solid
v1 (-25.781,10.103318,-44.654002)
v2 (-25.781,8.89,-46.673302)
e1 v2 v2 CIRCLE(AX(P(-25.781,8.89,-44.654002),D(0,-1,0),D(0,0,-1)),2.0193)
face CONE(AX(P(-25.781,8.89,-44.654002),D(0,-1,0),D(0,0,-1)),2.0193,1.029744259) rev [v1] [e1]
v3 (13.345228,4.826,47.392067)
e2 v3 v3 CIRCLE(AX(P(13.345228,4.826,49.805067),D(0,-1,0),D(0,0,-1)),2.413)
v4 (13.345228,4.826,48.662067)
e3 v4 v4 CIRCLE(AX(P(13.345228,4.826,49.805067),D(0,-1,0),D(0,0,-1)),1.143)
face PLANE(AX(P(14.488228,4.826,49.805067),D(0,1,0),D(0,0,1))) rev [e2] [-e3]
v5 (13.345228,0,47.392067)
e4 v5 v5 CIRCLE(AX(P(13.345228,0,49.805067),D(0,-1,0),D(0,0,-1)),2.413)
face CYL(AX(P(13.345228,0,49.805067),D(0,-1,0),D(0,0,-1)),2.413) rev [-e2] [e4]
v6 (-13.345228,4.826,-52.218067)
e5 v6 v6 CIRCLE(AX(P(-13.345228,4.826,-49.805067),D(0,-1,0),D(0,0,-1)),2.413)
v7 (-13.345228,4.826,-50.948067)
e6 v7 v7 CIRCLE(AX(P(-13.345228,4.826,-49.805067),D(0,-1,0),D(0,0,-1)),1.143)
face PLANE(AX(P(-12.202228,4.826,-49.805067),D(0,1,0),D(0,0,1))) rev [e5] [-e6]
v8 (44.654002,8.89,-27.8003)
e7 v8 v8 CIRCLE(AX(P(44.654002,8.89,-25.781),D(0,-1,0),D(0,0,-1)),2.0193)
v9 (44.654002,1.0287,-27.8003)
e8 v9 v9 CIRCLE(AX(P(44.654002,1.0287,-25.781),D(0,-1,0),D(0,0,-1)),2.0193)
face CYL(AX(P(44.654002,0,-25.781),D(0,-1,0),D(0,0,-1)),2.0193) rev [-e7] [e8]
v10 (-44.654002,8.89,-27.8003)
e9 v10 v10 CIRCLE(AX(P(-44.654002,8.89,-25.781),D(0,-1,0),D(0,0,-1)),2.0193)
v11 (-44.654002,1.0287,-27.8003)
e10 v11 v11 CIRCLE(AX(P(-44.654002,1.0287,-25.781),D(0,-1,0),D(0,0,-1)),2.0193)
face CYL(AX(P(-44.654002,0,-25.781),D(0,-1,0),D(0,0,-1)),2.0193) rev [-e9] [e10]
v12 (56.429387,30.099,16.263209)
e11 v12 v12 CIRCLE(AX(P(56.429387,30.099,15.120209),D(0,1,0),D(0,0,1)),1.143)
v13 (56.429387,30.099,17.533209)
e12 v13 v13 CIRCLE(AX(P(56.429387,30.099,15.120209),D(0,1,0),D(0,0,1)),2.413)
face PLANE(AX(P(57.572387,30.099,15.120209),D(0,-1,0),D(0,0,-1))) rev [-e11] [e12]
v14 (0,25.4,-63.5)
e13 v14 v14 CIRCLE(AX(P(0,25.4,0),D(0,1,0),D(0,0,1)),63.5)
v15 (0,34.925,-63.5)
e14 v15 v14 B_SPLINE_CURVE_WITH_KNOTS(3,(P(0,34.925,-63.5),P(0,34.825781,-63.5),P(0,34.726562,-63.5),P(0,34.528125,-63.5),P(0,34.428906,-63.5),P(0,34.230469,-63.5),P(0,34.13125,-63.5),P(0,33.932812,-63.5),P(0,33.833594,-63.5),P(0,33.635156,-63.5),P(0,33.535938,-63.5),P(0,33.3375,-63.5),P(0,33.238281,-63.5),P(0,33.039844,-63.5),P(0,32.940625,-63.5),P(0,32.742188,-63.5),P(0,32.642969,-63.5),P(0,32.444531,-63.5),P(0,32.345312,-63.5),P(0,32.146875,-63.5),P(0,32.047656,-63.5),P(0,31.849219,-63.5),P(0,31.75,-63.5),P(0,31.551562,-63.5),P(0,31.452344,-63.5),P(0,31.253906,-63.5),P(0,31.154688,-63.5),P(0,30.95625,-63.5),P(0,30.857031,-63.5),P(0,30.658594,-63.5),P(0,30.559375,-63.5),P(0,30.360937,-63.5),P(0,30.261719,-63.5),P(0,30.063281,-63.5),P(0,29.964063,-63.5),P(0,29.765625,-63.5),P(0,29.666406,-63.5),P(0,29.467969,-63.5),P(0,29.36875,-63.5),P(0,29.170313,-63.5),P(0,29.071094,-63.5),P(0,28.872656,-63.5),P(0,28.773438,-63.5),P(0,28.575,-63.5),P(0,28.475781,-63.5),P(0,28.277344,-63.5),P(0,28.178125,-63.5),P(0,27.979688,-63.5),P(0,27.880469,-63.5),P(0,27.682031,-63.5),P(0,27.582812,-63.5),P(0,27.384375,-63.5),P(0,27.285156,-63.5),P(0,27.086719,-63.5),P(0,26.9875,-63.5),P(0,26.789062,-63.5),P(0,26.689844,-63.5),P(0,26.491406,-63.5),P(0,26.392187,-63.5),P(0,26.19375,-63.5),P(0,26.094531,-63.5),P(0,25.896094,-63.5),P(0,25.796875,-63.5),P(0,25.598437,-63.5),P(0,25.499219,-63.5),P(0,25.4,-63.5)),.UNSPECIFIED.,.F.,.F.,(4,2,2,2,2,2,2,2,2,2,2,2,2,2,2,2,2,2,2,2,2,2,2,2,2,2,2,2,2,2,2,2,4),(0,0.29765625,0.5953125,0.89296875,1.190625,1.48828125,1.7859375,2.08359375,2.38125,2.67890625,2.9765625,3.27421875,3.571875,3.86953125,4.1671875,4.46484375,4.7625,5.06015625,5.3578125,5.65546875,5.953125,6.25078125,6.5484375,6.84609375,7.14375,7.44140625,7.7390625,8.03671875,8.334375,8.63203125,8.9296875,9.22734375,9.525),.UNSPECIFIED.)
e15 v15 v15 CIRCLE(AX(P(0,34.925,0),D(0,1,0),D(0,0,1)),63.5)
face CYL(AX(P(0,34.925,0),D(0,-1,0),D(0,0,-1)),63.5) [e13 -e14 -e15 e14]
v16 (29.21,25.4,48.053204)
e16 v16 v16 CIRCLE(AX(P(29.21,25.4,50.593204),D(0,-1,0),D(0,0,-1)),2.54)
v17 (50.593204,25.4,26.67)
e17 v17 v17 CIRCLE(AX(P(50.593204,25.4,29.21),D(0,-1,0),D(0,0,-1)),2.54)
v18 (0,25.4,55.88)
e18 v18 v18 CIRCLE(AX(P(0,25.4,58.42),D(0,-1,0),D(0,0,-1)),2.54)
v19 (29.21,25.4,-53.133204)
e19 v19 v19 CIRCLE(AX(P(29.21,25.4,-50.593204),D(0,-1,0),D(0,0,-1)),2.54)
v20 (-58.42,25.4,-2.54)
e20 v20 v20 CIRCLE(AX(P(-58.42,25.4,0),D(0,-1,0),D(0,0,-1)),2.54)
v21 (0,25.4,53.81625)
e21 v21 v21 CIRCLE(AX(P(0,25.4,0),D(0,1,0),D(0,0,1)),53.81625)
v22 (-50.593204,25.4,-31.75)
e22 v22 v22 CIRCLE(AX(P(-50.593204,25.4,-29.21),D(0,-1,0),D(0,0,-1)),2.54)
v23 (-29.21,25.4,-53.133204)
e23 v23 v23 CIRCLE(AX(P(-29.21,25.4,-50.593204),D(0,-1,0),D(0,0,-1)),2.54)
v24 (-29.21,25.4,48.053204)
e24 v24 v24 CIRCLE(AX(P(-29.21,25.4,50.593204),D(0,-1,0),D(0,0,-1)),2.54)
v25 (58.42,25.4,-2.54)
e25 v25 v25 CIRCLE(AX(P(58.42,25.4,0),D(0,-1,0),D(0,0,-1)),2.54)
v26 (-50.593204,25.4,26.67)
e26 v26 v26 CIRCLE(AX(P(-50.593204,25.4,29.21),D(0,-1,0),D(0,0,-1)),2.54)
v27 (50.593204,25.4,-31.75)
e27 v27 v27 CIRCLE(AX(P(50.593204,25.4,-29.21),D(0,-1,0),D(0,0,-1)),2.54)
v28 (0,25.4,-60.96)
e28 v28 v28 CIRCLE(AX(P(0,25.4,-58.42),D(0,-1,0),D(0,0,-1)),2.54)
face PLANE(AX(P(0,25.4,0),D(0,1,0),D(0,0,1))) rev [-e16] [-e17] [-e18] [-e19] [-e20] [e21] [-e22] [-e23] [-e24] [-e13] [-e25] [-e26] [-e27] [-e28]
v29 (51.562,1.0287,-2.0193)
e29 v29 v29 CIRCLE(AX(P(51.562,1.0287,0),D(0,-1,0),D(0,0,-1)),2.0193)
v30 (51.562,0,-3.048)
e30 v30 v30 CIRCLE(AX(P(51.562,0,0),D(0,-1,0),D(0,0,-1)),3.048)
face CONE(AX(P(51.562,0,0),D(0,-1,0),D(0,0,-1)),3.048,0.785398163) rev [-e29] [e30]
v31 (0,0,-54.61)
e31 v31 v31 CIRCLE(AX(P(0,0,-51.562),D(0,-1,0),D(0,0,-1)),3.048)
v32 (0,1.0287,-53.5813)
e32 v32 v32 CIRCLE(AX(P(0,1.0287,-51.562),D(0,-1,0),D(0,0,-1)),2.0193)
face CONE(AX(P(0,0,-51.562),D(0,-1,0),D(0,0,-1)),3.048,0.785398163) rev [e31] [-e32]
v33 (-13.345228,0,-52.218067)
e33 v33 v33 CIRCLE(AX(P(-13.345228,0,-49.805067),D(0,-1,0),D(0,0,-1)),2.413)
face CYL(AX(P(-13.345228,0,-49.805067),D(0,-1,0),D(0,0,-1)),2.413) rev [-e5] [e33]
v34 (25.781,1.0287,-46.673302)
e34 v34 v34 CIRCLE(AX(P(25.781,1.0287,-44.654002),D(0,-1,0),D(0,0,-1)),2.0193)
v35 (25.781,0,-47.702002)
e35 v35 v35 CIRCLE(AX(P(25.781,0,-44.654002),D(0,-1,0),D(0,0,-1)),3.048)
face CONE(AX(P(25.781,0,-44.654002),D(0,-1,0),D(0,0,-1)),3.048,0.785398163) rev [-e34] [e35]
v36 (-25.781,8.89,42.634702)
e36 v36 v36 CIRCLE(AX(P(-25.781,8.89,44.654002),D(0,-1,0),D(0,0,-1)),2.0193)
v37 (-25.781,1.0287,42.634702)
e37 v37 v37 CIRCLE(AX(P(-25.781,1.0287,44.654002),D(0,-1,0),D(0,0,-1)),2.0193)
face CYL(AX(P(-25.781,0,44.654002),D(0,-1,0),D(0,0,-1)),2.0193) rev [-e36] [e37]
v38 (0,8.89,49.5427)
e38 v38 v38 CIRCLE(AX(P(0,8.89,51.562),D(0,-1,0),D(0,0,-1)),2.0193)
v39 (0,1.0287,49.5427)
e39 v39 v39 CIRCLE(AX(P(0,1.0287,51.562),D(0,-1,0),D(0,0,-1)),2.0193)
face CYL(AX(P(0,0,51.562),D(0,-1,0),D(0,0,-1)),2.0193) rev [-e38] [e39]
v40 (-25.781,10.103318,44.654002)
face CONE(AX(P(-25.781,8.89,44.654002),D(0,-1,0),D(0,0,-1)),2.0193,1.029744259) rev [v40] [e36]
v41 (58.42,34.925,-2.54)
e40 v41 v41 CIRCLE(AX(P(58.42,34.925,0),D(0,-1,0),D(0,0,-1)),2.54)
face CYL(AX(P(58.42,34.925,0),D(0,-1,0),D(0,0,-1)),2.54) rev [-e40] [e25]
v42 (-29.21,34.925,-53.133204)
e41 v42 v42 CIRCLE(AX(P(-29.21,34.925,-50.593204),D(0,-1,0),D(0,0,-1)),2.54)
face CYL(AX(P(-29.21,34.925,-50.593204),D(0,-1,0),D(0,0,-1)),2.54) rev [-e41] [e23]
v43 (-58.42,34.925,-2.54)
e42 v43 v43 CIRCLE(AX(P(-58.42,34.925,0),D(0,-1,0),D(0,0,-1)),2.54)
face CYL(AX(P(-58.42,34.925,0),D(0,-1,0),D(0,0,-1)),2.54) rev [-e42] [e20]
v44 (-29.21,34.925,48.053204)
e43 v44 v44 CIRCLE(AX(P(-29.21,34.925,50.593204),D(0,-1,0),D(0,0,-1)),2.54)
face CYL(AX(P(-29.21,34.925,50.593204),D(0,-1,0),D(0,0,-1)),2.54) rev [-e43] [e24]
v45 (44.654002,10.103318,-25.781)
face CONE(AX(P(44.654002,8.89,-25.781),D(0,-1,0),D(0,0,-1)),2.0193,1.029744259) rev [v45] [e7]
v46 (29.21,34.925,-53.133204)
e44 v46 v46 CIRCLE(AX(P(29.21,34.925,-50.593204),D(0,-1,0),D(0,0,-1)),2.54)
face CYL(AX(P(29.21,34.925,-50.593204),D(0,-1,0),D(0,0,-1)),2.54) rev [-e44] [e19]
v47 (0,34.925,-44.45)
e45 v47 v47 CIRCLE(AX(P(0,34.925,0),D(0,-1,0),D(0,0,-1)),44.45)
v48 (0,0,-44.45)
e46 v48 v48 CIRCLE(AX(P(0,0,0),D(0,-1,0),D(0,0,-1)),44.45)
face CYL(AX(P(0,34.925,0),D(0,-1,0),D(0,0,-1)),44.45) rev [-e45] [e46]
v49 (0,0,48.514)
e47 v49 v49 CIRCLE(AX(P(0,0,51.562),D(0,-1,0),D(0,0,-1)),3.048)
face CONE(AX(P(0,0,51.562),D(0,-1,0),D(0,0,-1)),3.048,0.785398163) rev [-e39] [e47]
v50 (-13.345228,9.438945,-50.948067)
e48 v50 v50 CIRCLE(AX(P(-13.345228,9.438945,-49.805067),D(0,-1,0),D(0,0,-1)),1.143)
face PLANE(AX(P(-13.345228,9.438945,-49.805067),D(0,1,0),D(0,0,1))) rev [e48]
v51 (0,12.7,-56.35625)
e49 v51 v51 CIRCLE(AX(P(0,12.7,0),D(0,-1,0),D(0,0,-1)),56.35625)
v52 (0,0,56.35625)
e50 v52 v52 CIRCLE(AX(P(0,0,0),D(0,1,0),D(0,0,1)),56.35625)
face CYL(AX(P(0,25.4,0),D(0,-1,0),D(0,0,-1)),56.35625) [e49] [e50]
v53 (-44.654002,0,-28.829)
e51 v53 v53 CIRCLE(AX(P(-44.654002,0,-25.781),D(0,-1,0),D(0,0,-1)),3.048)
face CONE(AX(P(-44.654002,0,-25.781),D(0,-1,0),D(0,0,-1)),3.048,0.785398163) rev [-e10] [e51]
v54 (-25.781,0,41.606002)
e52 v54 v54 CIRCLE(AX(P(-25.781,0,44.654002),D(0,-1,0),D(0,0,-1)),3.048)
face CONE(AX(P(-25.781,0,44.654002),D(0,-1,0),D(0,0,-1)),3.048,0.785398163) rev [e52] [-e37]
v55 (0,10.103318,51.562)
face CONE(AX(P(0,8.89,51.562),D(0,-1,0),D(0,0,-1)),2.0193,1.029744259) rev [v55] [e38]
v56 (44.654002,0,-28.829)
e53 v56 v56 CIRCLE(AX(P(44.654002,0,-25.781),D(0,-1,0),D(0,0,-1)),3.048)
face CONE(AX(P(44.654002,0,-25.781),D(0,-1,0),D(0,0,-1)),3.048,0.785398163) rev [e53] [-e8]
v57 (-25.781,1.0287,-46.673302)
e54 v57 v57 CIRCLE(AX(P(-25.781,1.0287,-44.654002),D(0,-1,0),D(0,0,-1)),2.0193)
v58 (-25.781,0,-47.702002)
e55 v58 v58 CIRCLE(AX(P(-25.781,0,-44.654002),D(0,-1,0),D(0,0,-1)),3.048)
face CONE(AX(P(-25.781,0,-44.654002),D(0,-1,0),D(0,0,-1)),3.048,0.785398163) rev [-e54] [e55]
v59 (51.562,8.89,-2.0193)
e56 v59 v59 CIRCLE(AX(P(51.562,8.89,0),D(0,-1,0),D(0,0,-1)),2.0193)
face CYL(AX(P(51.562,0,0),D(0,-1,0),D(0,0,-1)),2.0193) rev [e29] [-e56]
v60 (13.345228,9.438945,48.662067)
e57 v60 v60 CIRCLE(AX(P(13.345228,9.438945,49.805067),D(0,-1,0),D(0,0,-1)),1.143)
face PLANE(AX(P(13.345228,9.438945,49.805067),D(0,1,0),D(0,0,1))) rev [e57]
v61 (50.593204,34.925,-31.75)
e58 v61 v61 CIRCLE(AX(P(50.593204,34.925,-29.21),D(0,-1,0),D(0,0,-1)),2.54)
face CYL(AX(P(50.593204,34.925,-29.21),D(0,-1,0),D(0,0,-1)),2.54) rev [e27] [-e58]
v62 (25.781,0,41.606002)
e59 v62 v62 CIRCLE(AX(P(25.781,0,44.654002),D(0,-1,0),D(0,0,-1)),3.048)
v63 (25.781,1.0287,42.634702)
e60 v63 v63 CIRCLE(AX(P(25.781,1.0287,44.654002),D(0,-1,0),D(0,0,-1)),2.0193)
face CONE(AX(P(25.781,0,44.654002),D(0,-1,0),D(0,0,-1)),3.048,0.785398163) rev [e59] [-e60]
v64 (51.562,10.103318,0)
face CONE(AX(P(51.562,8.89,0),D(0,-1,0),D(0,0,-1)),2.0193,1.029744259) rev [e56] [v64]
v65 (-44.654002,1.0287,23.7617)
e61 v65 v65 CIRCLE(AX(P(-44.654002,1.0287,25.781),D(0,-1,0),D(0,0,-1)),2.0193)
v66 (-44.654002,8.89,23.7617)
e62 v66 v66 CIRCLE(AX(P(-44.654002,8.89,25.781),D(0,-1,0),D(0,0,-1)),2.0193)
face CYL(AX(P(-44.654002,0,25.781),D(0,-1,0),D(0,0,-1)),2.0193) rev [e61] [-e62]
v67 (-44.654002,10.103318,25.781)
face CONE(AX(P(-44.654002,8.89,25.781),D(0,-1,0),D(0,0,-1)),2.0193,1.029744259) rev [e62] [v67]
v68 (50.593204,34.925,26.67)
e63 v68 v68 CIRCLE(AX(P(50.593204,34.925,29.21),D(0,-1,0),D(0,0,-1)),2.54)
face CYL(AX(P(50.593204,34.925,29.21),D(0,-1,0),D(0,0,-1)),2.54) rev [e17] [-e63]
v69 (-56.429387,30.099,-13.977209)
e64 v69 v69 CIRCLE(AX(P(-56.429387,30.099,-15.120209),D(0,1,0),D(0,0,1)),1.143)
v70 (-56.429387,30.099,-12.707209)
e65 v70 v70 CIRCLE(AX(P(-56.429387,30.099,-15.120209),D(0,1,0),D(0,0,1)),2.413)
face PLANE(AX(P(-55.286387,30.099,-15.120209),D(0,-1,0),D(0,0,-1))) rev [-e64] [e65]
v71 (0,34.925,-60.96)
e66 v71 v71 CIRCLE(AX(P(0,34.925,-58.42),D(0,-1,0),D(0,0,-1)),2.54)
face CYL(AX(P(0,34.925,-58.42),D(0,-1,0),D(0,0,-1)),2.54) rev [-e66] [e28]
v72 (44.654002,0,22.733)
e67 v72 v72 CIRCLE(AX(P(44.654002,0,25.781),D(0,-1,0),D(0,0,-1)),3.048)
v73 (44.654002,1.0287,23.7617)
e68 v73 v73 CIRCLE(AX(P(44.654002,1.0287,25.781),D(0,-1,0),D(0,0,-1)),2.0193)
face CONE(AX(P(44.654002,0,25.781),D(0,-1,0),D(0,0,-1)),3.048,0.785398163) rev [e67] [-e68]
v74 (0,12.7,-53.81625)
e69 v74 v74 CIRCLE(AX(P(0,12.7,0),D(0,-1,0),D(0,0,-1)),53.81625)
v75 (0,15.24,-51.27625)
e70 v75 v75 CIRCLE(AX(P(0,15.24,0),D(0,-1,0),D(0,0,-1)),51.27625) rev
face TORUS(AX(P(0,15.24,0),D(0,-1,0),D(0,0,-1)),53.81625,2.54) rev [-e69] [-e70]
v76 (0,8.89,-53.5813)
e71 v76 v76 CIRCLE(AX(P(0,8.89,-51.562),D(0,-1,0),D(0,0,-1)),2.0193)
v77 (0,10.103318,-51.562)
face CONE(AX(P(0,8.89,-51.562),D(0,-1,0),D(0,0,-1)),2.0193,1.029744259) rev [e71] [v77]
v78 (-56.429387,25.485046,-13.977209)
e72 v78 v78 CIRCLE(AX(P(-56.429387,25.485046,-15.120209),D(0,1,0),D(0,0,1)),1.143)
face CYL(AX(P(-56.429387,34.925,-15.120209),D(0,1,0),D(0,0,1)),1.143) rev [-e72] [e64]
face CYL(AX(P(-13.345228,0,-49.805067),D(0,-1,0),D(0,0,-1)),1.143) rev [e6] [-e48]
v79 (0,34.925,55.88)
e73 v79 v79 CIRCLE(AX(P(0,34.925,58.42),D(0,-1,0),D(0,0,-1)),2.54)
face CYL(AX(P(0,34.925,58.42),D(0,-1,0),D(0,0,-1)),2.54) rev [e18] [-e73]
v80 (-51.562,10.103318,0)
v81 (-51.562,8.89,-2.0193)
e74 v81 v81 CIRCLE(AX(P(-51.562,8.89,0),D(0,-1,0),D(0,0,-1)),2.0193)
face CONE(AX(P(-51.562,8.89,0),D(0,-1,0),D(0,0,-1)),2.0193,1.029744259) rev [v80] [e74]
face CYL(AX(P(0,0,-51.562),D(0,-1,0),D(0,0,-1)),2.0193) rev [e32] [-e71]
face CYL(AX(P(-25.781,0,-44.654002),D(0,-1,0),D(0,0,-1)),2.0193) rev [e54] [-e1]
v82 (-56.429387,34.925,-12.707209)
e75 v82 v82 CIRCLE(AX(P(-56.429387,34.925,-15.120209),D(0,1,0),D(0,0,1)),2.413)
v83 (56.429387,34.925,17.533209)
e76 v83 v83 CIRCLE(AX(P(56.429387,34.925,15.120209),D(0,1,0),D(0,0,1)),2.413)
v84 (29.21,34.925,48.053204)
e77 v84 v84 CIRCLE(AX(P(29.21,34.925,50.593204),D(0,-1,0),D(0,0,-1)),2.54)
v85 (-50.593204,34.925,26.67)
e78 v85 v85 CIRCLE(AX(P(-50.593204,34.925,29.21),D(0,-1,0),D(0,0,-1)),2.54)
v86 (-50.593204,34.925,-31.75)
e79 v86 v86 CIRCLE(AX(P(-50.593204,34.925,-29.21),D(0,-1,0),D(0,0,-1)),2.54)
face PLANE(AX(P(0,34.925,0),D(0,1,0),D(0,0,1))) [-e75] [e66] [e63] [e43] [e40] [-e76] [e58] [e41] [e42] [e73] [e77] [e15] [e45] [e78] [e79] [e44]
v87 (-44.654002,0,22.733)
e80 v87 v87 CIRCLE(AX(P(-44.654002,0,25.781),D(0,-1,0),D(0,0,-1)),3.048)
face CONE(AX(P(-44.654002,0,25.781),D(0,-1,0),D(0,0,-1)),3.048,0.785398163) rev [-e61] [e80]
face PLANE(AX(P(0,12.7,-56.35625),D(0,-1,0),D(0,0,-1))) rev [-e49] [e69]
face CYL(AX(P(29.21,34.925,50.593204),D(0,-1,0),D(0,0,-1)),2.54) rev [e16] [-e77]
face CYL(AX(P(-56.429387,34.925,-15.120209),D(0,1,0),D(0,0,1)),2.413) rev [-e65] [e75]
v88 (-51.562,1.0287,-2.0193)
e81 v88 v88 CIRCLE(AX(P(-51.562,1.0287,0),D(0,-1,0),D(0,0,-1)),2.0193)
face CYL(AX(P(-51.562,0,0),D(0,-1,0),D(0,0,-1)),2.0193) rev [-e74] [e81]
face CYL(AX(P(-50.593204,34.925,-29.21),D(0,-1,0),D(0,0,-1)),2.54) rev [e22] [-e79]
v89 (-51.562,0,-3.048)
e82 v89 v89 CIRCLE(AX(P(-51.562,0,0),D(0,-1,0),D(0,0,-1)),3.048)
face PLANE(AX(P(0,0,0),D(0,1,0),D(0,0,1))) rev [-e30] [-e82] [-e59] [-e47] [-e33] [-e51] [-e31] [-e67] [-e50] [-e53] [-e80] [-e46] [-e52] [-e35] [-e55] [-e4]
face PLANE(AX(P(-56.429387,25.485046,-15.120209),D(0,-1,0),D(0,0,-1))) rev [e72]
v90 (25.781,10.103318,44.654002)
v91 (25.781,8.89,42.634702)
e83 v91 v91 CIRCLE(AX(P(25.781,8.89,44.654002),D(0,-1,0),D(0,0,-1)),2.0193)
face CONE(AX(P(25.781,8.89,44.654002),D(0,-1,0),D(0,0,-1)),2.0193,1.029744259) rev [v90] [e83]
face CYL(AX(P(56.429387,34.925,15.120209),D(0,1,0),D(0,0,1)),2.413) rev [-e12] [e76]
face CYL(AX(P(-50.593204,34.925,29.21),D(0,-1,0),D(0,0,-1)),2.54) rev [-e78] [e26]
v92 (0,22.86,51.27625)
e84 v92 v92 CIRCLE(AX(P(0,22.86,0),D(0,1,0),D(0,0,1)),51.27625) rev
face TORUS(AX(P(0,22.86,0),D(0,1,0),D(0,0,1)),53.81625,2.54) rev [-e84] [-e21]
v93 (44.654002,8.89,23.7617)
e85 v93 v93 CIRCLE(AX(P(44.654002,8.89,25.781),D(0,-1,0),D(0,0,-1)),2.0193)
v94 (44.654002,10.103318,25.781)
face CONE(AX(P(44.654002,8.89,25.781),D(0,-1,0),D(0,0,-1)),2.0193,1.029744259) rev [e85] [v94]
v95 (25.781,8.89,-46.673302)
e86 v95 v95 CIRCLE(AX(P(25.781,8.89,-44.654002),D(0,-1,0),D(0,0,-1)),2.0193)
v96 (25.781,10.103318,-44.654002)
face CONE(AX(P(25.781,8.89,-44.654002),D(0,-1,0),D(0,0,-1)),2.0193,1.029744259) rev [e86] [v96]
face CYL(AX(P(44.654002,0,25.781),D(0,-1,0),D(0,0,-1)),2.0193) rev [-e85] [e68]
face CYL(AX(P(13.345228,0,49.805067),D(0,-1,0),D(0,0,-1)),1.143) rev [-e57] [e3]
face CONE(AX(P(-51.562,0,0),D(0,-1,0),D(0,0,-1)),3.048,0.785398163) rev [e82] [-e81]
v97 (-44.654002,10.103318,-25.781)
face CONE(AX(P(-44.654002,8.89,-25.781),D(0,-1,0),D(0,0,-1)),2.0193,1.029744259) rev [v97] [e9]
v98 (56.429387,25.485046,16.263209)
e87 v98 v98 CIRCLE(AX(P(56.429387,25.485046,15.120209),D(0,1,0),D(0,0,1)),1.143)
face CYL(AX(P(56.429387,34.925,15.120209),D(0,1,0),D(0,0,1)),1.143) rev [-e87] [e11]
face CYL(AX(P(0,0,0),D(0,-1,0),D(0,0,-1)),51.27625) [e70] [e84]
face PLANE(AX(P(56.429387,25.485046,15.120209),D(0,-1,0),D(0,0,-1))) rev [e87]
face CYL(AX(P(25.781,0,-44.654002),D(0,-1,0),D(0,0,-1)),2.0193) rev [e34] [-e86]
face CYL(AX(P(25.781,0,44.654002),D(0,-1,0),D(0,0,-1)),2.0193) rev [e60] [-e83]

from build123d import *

# Parameters (mm, degrees)
SKETCH2_R           = 56.35625
BOSS_EXTRUDE1_DEPTH = 25.4
SKETCH3_R           = 63.5
BOSS_EXTRUDE2_DEPTH = 9.525
SKETCH4_R           = 44.45
CUT_EXTRUDE1_DEPTH  = 97.35484225
SKETCH9_W           = 5.08
SKETCH9_H           = 12.7
FILLET1_R           = 2.54
SKETCH10_R          = 2.54
CUT_EXTRUDE2_DEPTH  = 94.3255592
CIRPATTERN1_COUNT   = 12
HOLE2_START         = 30.099
HOLE2_OUTLINE_R     = 2.413
HOLE2_DEPTH         = 4.826
HOLE2_START_2       = 25.485046345
HOLE2_2_OUTLINE_R   = 1.143
HOLE2_2_DEPTH       = 4.613953655
CIRPATTERN2_COUNT   = 2
HOLE3_D             = 2.286
HOLE3_DEPTH         = 9.438944644
HOLE3_CBORE_D       = 4.826
HOLE3_CBORE_DEPTH   = 4.826
CIRPATTERN3_COUNT   = 2


# Read off the part's stored shape, not the designer's step: Hole2
with BuildPart() as part:
    # Sketch2 → Boss-Extrude1 (new body)
    with BuildSketch(Plane(origin=(0, 0, 0), x_dir=(1, 0, 0), z_dir=(0, 1, 0))):
        with Locations(Location((0, 0, 0), (0, 0, 270))):
            Circle(SKETCH2_R)
    extrude(amount=BOSS_EXTRUDE1_DEPTH)

    # Sketch3 → Boss-Extrude2 (add)
    with BuildSketch(Plane(origin=(0, 25.4, 0), x_dir=(1, 0, 0), z_dir=(0, 1, 0))):
        with Locations(Location((0, 0, 0), (0, 0, 90))):
            Circle(SKETCH3_R)
    extrude(amount=BOSS_EXTRUDE2_DEPTH)

    # Sketch4 → Cut-Extrude1 (cut, through all)
    with BuildSketch(Plane.XZ):
        with Locations(Location((0, 0, 0), (0, 0, 270))):
            Circle(SKETCH4_R)
    extrude(amount=-CUT_EXTRUDE1_DEPTH, mode=Mode.SUBTRACT)

    # Sketch9 → Cut-Revolve1 (revolve, cut)
    with BuildSketch(Plane(origin=(0, 0, 0), x_dir=(0, 0, -1), z_dir=(1, 0, 0))):
        with Locations((53.81625, 19.05)):
            Rectangle(SKETCH9_W, SKETCH9_H)
    revolve(axis=Axis((0, 0, 0), (0, 1, 0)), mode=Mode.SUBTRACT)

    # Fillet1
    fillet1_edges = [part.edges().sort_by_distance(p)[0] for p in [
        (0, 12.7, 51.27625),
        (0, 25.4, 51.27625),
    ]]
    fillet(fillet1_edges, radius=FILLET1_R)

    # Sketch10 → Cut-Extrude2 (cut, through all)
    with BuildSketch(Plane.XZ.offset(-25.4)):
        with Locations(Location((58.42, 0, 0), (0, 0, 270))):
            Circle(SKETCH10_R)
        with Locations(Location((50.593204089, -29.21, 0), (0, 0, 270))):
            Circle(SKETCH10_R)
        with Locations(Location((29.21, -50.593204089, 0), (0, 0, 270))):
            Circle(SKETCH10_R)
        with Locations(Location((0, -58.42, 0), (0, 0, 270))):
            Circle(SKETCH10_R)
        with Locations(Location((-29.21, -50.593204089, 0), (0, 0, 270))):
            Circle(SKETCH10_R)
        with Locations(Location((-50.593204089, -29.21, 0), (0, 0, 270))):
            Circle(SKETCH10_R)
        with Locations(Location((-58.42, 0, 0), (0, 0, 270))):
            Circle(SKETCH10_R)
        with Locations(Location((-50.593204089, 29.21, 0), (0, 0, 270))):
            Circle(SKETCH10_R)
        with Locations(Location((-29.21, 50.593204089, 0), (0, 0, 270))):
            Circle(SKETCH10_R)
        with Locations(Location((0, 58.42, 0), (0, 0, 270))):
            Circle(SKETCH10_R)
        with Locations(Location((29.21, 50.593204089, 0), (0, 0, 270))):
            Circle(SKETCH10_R)
        with Locations(Location((50.593204089, 29.21, 0), (0, 0, 270))):
            Circle(SKETCH10_R)
    extrude(amount=-CUT_EXTRUDE2_DEPTH, mode=Mode.SUBTRACT)

    # Sketch12 → #10-32 Tapped Hole1 (revolve, cut)
    with BuildSketch(Plane(origin=(51.562, 0, 0), x_dir=(0, 0, -1), z_dir=(1, 0, 0))):
        Polygon((0, 0), (0, 10.103317848), (2.0193, 8.89), (2.0193, 1.0287), (3.048, 0), align=None)
    f_10_32_tapped_hole1 = revolve(axis=Axis((51.562, -6.35, 0), (0, 1, 0)), mode=Mode.SUBTRACT)

    # CirPattern1: #10-32 Tapped Hole1 ×12 about axis
    cirpattern1_axis = Axis((0, 0, 0), (0, 1, 0))
    for i in range(1, CIRPATTERN1_COUNT):
        add(f_10_32_tapped_hole1.rotate(cirpattern1_axis, i * 360 / CIRPATTERN1_COUNT), mode=Mode.SUBTRACT)

    # Hole2 outline → Hole2 (cut)
    with BuildSketch(Plane(origin=(0, 0, 0), x_dir=(1, 0, 0), z_dir=(0, 1, 0)).offset(HOLE2_START)):
        with Locations((56.429386772, -15.120208615)):
            Circle(HOLE2_OUTLINE_R)
    hole2 = extrude(amount=HOLE2_DEPTH, mode=Mode.SUBTRACT)

    # Hole2 2 outline → Hole2 2 (cut)
    with BuildSketch(Plane(origin=(0, 0, 0), x_dir=(1, 0, 0), z_dir=(0, 1, 0)).offset(HOLE2_START_2)):
        with Locations((56.429386772, -15.120208615)):
            Circle(HOLE2_2_OUTLINE_R)
    hole2_2 = extrude(amount=HOLE2_2_DEPTH, mode=Mode.SUBTRACT)

    # CirPattern2: Hole2, Hole2 2 ×2 about axis
    cirpattern2_axis = Axis((0, 0, 0), (0, 1, 0))
    add([hole2.rotate(cirpattern2_axis, i * 360 / CIRPATTERN2_COUNT) for i in range(1, CIRPATTERN2_COUNT)], mode=Mode.SUBTRACT)
    add([hole2_2.rotate(cirpattern2_axis, i * 360 / CIRPATTERN2_COUNT) for i in range(1, CIRPATTERN2_COUNT)], mode=Mode.SUBTRACT)

    # Hole3
    with Locations(Plane(origin=(0, 0, 0), x_dir=(-1, 0, 0), z_dir=(0, -1, 0))):
        with Locations((-13.345227604, -49.805067455)):
            hole3 = CounterBoreHole(HOLE3_D / 2, HOLE3_CBORE_D / 2, HOLE3_CBORE_DEPTH, depth=HOLE3_DEPTH)

    # CirPattern3: Hole3 ×2 about axis
    cirpattern3_axis = Axis((0, 0, 0), (0, 1, 0))
    for i in range(1, CIRPATTERN3_COUNT):
        add(hole3.rotate(cirpattern3_axis, i * 360 / CIRPATTERN3_COUNT), mode=Mode.SUBTRACT)


solid = part.part
